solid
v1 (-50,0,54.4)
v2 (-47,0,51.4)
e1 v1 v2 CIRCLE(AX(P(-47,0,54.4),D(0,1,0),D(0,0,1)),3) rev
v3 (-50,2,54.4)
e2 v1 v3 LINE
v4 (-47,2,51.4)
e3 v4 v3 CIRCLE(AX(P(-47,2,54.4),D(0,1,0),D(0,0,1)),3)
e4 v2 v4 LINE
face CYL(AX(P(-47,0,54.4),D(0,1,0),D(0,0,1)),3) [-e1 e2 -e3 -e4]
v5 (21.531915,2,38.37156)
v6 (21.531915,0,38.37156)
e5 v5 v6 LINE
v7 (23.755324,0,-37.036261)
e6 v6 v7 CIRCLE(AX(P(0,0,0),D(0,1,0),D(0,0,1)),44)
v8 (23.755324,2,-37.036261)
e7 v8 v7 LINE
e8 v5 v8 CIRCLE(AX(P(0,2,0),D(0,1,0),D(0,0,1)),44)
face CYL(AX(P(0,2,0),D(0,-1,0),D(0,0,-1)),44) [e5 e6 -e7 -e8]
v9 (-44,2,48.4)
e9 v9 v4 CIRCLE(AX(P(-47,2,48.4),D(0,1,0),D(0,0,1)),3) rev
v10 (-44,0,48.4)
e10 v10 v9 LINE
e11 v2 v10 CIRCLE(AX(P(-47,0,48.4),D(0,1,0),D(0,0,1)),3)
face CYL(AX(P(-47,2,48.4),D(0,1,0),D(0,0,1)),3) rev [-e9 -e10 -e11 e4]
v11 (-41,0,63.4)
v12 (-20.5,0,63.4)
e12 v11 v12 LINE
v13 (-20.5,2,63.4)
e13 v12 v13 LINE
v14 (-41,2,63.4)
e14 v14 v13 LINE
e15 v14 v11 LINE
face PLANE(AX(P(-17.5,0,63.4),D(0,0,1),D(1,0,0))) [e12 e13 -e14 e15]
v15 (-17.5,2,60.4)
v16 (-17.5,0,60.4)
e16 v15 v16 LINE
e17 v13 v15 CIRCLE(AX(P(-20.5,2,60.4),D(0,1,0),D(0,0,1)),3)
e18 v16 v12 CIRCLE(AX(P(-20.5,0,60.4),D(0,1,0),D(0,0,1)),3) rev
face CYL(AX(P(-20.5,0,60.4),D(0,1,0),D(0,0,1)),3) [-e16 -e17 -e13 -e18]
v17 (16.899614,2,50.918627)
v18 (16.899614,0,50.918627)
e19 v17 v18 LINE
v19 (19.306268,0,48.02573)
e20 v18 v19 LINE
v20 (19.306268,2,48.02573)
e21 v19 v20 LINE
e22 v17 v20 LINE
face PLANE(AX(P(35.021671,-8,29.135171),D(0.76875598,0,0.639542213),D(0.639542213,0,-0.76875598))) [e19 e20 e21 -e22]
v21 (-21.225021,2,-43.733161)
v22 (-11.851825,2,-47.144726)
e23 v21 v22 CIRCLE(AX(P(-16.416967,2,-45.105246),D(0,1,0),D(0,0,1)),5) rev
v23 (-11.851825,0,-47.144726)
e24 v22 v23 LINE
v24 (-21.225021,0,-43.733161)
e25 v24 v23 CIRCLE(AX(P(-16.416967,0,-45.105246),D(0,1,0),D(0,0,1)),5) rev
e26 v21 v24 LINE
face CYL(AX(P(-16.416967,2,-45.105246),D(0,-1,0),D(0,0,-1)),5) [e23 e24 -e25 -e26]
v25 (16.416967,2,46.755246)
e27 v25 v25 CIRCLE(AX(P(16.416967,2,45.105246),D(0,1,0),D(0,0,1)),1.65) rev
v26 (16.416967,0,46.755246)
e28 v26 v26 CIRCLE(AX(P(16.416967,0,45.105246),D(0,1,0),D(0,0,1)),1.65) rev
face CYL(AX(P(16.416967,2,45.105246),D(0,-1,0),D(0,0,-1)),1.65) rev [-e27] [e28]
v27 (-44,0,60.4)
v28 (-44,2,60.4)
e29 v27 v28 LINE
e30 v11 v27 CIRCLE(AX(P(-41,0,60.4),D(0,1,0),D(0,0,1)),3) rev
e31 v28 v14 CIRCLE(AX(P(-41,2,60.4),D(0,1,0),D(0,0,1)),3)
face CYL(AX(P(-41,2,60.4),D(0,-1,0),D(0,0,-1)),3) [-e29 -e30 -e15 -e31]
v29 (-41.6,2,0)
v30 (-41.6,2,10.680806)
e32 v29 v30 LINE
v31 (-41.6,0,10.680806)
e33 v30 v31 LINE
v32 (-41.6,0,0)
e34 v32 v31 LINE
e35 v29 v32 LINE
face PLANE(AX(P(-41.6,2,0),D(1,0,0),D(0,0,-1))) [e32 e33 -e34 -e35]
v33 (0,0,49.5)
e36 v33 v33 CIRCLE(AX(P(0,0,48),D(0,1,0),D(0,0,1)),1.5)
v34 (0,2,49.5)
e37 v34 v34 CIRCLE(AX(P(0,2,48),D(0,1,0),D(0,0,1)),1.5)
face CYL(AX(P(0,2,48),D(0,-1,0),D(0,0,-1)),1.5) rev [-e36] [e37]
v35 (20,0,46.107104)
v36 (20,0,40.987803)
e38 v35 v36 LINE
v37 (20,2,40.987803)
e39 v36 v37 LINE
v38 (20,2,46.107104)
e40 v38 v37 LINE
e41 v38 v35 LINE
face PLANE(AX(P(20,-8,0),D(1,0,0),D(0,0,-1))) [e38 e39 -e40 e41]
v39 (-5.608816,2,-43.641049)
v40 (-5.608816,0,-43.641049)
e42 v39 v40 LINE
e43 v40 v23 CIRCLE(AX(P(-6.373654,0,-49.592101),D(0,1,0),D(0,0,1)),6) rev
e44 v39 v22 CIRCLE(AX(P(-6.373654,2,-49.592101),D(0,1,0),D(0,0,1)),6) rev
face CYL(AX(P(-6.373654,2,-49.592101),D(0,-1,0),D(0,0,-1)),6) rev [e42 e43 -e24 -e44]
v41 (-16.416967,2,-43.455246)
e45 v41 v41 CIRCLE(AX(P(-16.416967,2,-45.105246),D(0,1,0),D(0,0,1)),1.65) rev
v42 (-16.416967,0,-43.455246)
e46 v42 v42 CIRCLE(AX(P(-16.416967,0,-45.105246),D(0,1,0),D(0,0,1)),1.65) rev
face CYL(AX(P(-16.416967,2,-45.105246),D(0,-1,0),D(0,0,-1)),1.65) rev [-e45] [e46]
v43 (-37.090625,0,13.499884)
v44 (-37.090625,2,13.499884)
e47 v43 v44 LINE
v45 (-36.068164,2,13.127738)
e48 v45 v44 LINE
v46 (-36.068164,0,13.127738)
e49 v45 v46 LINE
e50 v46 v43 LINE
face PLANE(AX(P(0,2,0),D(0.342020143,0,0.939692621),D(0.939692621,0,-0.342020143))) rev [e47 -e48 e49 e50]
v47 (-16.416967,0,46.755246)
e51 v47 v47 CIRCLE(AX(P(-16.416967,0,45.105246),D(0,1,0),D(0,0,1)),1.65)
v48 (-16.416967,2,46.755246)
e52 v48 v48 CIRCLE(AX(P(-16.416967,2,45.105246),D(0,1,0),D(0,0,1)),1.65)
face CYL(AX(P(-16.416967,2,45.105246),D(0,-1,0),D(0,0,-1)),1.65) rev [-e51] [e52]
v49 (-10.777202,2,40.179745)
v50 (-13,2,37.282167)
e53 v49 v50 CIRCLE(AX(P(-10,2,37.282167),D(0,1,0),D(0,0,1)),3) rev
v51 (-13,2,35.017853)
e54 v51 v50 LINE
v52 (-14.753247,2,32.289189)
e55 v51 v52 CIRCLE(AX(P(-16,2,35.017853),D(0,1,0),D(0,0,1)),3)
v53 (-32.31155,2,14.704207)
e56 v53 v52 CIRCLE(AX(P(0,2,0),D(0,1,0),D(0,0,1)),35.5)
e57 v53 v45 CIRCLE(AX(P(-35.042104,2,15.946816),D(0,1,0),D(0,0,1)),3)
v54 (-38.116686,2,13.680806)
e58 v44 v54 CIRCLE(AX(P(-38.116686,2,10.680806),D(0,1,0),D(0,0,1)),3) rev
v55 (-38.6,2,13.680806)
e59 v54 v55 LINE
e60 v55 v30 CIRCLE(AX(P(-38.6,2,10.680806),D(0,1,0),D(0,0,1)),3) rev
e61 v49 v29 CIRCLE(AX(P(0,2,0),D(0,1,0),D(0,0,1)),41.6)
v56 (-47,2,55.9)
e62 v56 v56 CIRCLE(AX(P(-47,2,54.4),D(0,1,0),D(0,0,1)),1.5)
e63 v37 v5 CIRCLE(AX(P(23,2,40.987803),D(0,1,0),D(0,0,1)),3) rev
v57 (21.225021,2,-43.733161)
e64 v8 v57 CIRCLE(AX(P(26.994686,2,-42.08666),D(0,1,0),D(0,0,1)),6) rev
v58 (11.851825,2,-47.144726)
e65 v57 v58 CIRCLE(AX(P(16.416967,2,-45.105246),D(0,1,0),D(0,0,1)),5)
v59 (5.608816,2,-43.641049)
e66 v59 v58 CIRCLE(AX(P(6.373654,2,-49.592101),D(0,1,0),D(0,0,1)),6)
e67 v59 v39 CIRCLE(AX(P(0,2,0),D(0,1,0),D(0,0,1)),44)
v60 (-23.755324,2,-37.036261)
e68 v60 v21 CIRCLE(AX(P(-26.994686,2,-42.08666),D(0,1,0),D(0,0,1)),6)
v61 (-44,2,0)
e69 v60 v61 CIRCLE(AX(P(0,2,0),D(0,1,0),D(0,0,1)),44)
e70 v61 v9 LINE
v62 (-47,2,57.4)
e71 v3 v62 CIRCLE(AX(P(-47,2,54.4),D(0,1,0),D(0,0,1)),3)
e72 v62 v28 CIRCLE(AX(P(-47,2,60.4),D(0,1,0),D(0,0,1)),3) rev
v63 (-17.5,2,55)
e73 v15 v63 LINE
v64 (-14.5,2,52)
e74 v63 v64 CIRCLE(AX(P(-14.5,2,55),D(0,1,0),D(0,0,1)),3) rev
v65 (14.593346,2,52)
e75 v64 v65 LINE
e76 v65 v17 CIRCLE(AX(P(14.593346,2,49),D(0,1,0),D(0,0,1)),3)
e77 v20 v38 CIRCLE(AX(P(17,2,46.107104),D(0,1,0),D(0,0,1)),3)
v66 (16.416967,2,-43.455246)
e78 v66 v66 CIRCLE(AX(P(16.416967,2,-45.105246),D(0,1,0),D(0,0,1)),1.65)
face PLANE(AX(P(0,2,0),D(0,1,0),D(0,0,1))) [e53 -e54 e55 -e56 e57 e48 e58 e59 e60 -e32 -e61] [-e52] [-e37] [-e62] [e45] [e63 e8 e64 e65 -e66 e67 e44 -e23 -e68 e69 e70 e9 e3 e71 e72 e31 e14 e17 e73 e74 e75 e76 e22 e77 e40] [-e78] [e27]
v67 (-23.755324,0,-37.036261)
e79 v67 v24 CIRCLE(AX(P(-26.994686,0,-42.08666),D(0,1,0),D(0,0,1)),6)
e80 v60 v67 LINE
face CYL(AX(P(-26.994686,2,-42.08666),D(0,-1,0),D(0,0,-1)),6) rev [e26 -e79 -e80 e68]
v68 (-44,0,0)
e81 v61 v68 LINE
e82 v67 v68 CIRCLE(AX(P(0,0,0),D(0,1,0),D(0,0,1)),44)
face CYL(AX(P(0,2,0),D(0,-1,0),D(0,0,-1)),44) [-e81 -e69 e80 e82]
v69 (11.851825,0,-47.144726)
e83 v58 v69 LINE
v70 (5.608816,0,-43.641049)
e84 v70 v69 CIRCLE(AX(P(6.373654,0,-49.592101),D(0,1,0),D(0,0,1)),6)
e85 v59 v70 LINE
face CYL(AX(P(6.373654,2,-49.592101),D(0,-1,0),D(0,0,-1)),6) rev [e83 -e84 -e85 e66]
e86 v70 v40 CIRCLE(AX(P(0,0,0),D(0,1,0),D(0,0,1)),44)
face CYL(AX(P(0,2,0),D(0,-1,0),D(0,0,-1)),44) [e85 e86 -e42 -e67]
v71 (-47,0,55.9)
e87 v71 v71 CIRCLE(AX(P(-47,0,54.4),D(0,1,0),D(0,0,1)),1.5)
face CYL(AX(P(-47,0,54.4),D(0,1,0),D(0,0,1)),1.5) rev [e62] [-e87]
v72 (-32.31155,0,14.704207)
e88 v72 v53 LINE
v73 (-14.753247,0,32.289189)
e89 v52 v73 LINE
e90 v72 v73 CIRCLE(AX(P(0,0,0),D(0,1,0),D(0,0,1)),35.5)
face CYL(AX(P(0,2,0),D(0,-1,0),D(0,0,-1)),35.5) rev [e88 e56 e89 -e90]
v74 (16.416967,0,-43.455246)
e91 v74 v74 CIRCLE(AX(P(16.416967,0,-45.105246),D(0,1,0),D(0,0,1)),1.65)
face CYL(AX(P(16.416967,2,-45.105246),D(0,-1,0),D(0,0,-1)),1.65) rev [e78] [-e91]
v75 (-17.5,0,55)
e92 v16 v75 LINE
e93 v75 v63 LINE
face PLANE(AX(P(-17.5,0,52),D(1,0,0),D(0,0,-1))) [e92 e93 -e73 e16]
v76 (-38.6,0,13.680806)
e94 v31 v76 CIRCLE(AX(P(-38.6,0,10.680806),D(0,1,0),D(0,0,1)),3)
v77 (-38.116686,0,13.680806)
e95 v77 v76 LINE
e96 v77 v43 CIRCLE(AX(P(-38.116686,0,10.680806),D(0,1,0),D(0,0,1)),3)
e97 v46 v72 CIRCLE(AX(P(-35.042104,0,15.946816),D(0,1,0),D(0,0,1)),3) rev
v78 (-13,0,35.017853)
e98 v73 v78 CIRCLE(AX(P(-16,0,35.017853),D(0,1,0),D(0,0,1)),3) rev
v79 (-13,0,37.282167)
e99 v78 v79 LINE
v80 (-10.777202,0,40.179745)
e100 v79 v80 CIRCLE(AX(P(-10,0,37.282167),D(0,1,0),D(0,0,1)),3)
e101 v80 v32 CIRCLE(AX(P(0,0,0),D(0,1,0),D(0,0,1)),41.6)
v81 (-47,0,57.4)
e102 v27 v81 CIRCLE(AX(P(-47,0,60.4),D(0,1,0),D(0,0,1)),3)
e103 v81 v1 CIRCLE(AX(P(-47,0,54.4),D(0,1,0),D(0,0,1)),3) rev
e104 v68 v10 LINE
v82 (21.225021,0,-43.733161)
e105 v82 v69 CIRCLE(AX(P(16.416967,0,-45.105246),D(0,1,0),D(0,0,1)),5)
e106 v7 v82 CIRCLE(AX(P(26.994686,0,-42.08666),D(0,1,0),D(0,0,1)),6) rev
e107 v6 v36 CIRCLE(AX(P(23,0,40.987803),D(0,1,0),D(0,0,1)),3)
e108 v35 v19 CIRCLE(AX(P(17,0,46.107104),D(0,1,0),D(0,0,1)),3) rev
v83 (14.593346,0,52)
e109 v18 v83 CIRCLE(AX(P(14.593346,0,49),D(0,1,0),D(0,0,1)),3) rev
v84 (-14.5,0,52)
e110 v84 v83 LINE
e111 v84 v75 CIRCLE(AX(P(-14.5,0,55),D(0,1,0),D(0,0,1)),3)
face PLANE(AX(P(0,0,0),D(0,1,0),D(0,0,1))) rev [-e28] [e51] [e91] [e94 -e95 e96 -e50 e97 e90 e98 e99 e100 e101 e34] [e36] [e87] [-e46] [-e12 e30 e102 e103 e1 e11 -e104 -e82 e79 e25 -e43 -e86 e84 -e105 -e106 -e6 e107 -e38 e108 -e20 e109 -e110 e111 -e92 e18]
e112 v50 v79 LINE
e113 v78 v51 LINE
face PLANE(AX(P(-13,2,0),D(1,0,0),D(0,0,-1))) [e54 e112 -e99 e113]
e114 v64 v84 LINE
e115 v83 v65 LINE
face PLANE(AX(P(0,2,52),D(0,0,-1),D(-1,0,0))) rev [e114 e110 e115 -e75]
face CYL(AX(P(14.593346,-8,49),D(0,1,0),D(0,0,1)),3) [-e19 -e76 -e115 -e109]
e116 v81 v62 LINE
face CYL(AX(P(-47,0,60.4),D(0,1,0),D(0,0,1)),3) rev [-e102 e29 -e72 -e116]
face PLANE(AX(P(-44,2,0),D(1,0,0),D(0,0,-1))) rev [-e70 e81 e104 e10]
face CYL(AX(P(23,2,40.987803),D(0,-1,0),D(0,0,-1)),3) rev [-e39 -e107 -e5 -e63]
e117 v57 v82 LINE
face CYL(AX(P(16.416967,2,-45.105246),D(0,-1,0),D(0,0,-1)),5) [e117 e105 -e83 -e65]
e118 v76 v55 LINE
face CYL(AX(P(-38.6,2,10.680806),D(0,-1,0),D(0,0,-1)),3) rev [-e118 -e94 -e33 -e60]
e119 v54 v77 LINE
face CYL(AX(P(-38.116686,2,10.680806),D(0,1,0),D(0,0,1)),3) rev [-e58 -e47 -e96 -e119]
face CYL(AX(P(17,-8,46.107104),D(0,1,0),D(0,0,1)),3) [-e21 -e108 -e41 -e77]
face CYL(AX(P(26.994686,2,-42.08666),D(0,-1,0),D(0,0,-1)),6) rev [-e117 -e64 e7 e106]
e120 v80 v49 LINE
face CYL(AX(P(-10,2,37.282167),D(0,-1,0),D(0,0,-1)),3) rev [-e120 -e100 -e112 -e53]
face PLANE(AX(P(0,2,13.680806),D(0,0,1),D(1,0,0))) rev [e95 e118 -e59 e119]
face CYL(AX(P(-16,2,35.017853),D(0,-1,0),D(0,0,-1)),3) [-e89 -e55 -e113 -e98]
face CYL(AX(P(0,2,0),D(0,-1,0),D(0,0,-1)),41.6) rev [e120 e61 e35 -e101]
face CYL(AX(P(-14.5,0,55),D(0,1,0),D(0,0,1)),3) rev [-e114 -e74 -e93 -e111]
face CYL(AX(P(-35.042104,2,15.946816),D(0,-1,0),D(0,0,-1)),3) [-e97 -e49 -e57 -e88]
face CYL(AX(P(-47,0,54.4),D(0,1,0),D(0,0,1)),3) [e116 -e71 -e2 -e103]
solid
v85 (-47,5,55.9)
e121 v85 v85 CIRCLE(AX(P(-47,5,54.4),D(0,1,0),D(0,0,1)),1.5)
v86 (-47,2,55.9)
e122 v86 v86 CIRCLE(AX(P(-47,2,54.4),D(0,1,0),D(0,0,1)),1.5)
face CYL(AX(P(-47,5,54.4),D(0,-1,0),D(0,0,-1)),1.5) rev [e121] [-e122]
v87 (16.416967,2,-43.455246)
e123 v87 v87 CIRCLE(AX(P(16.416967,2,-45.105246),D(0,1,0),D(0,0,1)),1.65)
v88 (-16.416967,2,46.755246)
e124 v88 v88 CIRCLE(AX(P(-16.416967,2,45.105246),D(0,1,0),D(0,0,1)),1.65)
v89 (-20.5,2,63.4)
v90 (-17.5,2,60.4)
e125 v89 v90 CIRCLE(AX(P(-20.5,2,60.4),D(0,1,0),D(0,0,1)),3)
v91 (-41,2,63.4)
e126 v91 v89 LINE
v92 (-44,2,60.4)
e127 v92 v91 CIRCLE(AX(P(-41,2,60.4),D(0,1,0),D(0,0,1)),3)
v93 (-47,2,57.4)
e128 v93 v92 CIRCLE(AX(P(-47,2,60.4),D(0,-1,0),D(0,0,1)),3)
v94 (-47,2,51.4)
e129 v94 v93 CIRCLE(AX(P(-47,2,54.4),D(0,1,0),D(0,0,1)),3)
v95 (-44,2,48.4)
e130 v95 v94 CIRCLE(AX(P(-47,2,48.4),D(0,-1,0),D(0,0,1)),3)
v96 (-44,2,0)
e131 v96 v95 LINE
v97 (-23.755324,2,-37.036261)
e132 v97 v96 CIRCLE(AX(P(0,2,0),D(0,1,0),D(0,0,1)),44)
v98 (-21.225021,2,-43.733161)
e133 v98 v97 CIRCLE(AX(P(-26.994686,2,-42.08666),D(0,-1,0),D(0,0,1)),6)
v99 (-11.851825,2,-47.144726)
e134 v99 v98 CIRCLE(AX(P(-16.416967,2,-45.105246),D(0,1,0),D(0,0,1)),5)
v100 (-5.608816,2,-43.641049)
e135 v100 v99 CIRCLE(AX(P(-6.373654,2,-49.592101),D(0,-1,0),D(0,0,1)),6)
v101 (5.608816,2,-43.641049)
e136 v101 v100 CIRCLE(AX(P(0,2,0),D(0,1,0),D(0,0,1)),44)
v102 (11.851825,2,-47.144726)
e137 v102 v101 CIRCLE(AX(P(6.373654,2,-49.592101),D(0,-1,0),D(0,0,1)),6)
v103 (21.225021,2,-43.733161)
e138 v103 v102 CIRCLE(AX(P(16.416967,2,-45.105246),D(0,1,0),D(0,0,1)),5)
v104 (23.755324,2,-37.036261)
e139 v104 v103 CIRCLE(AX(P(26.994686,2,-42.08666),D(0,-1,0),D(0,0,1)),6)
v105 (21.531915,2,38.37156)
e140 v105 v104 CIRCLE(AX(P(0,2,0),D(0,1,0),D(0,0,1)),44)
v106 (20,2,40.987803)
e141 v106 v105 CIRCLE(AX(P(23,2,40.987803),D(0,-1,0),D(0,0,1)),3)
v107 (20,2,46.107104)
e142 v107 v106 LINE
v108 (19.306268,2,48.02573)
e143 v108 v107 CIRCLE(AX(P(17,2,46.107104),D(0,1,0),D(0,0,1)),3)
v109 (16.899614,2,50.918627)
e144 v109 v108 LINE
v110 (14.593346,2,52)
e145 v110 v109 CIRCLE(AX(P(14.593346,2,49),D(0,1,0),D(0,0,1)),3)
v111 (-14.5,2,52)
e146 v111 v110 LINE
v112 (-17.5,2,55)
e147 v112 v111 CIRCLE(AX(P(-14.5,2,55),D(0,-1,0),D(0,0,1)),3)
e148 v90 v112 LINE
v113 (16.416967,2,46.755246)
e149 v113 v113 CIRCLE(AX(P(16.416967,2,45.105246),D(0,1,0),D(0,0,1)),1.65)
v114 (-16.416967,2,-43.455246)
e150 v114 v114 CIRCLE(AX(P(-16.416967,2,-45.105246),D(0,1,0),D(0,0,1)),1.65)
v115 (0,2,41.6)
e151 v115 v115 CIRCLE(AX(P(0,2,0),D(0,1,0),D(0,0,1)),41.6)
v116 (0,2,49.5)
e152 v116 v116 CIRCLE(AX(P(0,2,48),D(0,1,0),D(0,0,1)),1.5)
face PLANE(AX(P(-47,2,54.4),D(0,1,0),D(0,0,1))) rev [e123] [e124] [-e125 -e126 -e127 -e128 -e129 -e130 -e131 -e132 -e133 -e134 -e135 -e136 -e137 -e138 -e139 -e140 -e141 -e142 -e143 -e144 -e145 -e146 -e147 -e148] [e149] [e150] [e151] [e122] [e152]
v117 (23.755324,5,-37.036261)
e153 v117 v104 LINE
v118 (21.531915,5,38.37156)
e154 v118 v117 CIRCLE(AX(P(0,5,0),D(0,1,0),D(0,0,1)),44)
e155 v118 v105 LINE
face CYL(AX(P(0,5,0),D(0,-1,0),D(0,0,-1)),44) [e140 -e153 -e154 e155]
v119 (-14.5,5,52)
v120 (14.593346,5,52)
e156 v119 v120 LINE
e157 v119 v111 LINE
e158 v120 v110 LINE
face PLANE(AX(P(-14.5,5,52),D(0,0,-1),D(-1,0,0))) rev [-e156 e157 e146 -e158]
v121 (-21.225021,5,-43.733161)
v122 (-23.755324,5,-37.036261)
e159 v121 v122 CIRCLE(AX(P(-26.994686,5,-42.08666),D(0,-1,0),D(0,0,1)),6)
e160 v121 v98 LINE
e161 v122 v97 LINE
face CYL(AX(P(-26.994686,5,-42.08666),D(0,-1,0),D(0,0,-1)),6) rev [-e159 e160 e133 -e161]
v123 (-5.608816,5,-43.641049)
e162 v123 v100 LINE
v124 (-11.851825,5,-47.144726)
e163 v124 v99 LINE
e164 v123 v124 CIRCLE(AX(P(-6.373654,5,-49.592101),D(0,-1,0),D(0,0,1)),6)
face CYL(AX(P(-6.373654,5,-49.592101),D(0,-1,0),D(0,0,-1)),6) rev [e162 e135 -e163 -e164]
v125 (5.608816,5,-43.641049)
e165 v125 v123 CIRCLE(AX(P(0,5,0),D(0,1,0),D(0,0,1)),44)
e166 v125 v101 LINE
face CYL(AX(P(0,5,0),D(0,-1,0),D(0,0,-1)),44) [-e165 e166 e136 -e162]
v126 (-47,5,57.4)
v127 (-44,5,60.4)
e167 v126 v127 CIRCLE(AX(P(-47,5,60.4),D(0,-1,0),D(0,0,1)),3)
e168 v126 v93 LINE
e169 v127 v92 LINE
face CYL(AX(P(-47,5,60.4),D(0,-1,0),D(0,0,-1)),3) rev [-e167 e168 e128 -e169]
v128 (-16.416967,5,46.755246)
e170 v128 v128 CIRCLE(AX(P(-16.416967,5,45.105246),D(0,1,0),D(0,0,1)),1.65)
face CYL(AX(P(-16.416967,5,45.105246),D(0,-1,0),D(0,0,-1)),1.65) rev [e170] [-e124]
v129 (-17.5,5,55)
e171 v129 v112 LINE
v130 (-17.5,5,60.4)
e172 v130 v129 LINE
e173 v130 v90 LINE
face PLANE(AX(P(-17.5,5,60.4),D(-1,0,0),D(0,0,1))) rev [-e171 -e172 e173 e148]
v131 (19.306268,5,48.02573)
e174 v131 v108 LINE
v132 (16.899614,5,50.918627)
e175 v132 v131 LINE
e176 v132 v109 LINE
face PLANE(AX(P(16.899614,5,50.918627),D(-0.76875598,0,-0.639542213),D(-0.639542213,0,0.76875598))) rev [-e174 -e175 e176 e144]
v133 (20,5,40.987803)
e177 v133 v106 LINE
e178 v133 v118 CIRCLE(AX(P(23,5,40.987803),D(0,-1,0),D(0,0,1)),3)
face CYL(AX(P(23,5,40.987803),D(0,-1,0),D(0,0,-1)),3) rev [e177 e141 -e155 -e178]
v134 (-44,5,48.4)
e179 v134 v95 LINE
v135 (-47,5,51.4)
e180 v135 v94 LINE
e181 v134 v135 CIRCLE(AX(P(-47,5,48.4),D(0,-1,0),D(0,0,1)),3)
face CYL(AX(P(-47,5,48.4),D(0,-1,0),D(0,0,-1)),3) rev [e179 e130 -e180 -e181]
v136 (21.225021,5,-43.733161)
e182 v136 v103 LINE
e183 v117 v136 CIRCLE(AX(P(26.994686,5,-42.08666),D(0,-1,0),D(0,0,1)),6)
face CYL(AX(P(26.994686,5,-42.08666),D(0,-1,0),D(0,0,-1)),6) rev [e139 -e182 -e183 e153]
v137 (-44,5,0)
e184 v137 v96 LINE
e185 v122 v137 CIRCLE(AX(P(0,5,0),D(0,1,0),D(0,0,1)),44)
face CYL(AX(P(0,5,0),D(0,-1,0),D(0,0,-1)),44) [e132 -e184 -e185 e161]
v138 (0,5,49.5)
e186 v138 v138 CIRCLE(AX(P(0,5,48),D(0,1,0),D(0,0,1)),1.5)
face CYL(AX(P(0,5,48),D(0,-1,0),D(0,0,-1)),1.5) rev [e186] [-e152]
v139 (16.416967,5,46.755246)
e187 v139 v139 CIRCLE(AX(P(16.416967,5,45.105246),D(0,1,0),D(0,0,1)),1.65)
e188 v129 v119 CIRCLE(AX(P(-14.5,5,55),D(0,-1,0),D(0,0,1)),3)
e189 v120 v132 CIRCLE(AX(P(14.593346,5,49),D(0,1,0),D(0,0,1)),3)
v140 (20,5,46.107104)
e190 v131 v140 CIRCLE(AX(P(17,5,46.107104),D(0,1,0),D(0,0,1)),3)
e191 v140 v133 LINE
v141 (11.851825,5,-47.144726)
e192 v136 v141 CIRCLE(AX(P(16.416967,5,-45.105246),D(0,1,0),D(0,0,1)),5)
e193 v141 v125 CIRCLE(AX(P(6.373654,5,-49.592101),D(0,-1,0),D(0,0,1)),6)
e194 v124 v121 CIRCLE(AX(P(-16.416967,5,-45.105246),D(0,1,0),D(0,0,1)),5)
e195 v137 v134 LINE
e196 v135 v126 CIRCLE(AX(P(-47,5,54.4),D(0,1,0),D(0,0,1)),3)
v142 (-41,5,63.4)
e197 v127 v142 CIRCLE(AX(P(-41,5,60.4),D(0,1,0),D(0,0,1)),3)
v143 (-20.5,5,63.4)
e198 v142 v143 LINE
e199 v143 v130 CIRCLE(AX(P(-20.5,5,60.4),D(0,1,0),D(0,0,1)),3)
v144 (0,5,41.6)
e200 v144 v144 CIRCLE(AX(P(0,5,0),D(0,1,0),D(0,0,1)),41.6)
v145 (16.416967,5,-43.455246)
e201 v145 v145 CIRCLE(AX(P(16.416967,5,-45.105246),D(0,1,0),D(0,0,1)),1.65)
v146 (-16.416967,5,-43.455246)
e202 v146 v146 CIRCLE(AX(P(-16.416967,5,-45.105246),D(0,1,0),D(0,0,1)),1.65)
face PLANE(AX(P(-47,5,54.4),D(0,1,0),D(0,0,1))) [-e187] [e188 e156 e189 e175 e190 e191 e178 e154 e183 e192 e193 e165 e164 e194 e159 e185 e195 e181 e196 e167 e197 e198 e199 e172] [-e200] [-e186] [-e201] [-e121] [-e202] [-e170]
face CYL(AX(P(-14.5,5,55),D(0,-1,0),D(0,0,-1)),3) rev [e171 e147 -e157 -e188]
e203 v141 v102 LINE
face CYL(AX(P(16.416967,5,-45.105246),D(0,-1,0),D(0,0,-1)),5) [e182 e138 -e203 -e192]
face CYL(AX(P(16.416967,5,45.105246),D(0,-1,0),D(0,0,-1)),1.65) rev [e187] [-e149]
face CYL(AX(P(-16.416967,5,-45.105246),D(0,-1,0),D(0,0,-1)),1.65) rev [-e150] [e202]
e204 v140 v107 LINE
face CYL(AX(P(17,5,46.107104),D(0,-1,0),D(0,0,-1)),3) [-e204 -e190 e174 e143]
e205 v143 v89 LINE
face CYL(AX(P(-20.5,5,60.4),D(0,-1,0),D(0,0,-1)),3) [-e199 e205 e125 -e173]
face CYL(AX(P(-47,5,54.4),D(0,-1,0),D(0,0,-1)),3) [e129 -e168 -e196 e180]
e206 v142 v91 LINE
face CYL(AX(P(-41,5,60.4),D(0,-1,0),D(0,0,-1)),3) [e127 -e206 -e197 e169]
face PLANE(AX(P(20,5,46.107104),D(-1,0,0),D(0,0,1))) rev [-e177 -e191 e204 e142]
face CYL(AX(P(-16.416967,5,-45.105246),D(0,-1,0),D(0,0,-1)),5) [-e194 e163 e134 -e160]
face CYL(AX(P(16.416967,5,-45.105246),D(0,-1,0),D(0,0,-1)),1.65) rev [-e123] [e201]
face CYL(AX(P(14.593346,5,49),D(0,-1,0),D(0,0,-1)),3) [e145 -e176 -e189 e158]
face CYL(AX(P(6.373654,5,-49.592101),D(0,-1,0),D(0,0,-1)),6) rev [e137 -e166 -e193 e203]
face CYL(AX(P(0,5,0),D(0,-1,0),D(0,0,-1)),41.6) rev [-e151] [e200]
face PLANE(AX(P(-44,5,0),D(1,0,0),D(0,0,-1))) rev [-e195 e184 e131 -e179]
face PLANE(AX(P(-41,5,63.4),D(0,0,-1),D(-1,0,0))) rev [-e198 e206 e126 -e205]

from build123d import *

# Parameters (mm, degrees)
EXTRUDE_1_OUTLINE_R   = 1.65
EXTRUDE_1_OUTLINE_R_2 = 1.5
EXTRUDE_1_DEPTH       = 2
FILLET_1_R            = 3
CUT_EXTRUDE_START     = -10
CUT_EXTRUDE_1_DEPTH   = 10
SKETCH_5_W            = 26.5
SKETCH_5_H            = 11.4
EXTRUDE_2_DEPTH       = 2
SKETCH_6_W            = 6
SKETCH_6_H            = 6
SKETCH_6_R            = 1.5
EXTRUDE_3_DEPTH       = 2
FILLET_2_R            = 3
SKETCH_7_R            = 41.6
SKETCH_7_R_2          = 1.65
SKETCH_7_R_3          = 1.5
EXTRUDE_4_DEPTH       = 3


# Read off the part's stored shape, not the designer's step: 凸台-拉伸1
with BuildPart() as part:
    # 凸台-拉伸1 outline → 凸台-拉伸1 (new body)
    with BuildSketch(Plane(origin=(0, 0, 0), x_dir=(1, 0, 0), z_dir=(0, 1, 0))):
        with BuildLine():
            ThreePointArc((-11.851824833, 47.144725656), (-18.127067596, 49.803708902), (-21.22502096, 43.733161266))
            ThreePointArc((-21.22502096, 43.733161266), (-21.381953702, 39.965990651), (-23.755323553, 37.036260649))
            ThreePointArc((-23.755323553, 37.036260649), (-38.608510955, 21.104096328), (-44, 0))
            Line((-44, 0), (-44, -52))
            Line((-44, -52), (16, -52))
            ThreePointArc((16, -52), (36.555057081, -29.52964612), (44, 0))
            ThreePointArc((44, 0), (38.608510955, 21.104096328), (23.755323553, 37.036260649))
            ThreePointArc((23.755323553, 37.036260649), (21.381953702, 39.965990651), (21.22502096, 43.733161266))
            ThreePointArc((21.22502096, 43.733161266), (18.127067596, 49.803708902), (11.851824833, 47.144725656))
            ThreePointArc((11.851824833, 47.144725656), (9.310116783, 44.359779962), (5.608815852, 43.641049308))
            ThreePointArc((5.608815852, 43.641049308), (0, 44), (-5.608815852, 43.641049308))
            ThreePointArc((-5.608815852, 43.641049308), (-9.310116783, 44.359779962), (-11.851824833, 47.144725656))
        make_face()
        with Locations((-16.41696688, -45.105245798)):
            Circle(EXTRUDE_1_OUTLINE_R, mode=Mode.SUBTRACT)
        with Locations((0, -48)):
            Circle(EXTRUDE_1_OUTLINE_R_2, mode=Mode.SUBTRACT)
        with Locations((16.41696688, -45.105245798)):
            Circle(EXTRUDE_1_OUTLINE_R, mode=Mode.SUBTRACT)
        with Locations((-16.41696688, 45.105245798)):
            Circle(EXTRUDE_1_OUTLINE_R, mode=Mode.SUBTRACT)
        with BuildLine():
            Line((-13, -39.516578799), (-13, -33.034073318))
            ThreePointArc((-13, -33.034073318), (-25.424671464, -24.775715549), (-33.359088038, -12.141715088))
            Line((-33.359088038, -12.141715088), (-37.587704831, -13.680805733))
            Line((-37.587704831, -13.680805733), (-41.6, -13.680805733))
            Line((-41.6, -13.680805733), (-41.6, 0))
            ThreePointArc((-41.6, 0), (33.699851632, 24.390161951), (-13, -39.516578799))
        make_face(mode=Mode.SUBTRACT)
        with Locations((16.41696688, 45.105245798)):
            Circle(EXTRUDE_1_OUTLINE_R, mode=Mode.SUBTRACT)
    extrude(amount=EXTRUDE_1_DEPTH)

    # 圆角1
    fillet_1_edges = [part.edges().sort_by_distance(p)[0] for p in [
        (-13, 1, 33.034073318),
        (-13, 1, 39.516578799),
        (-41.6, 1, 13.680805733),
        (-37.587704831, 1, 13.680805733),
        (-33.359088038, 1, 12.141715088),
    ]]
    fillet(fillet_1_edges, radius=FILLET_1_R)

    # 草图3 → 切除-拉伸1 (cut)
    with BuildSketch(Plane(origin=(0, 2, 0), x_dir=(1, 0, 0), z_dir=(0, 1, 0)).offset(CUT_EXTRUDE_START)):
        with BuildLine():
            Line((20, -47.191835885), (16, -52))
            ThreePointArc((16, -52), (36.555057081, -29.52964612), (44, 0))
            ThreePointArc((44, 0), (37.523326079, -22.978250586), (20, -39.191835885))
            Line((20, -39.191835885), (20, -47.191835885))
        make_face()
    extrude(amount=CUT_EXTRUDE_1_DEPTH, mode=Mode.SUBTRACT)

    # 草图5 → 凸台-拉伸2 (add)
    with BuildSketch(Plane(origin=(0, 2, 0), x_dir=(1, 0, 0), z_dir=(0, 1, 0))):
        with Locations((-30.75, -57.7)):
            Rectangle(SKETCH_5_W, SKETCH_5_H)
    extrude(amount=-EXTRUDE_2_DEPTH)

    # 草图6 → 凸台-拉伸3 (add)
    with BuildSketch(Plane(origin=(0, 2, 0), x_dir=(1, 0, 0), z_dir=(0, 1, 0))):
        with Locations((-47, -54.4)):
            Rectangle(SKETCH_6_W, SKETCH_6_H)
        with Locations(Location((-47, -54.4, 0), (0, 0, 270))):
            Circle(SKETCH_6_R, mode=Mode.SUBTRACT)
    extrude(amount=-EXTRUDE_3_DEPTH)

    # 圆角2
    fillet_2_edges = [part.edges().sort_by_distance(p)[0] for p in [
        (20, 1, 39.191835885),
        (20, 1, 47.191835885),
        (-17.5, 1, 52),
        (-17.5, 1, 63.4),
        (-44, 1, 63.4),
        (-44, 1, 51.4),
        (16, 1, 52),
        (-44, 1, 57.4),
        (-50, 1, 57.4),
        (-50, 1, 51.4),
    ]]
    fillet(fillet_2_edges, radius=FILLET_2_R - 0.0001)  # a hair under: the kernel refuses the full size


with BuildPart() as body_2:
    # 草图7 → 凸台-拉伸4 (new body)
    with BuildSketch(Plane(origin=(0, 2, 0), x_dir=(1, 0, 0), z_dir=(0, 1, 0))):
        with BuildLine():
            Line((-41, -63.4), (-20.5, -63.4))
            ThreePointArc((-20.5, -63.4), (-18.378679656, -62.521320344), (-17.5, -60.4))
            Line((-17.5, -60.4), (-17.5, -55))
            ThreePointArc((-17.5, -55), (-16.621320344, -52.878679656), (-14.5, -52))
            Line((-14.5, -52), (14.59334641, -52))
            ThreePointArc((14.59334641, -52), (15.866947619, -51.716236359), (16.899614351, -50.91862664))
            Line((16.899614351, -50.91862664), (19.306267941, -48.025730283))
            ThreePointArc((19.306267941, -48.025730283), (19.8212412, -47.12720074), (20, -46.107103642))
            Line((20, -46.107103642), (20, -40.987803064))
            ThreePointArc((20, -40.987803064), (20.411153218, -39.471929606), (21.531914894, -38.371560315))
            ThreePointArc((21.531914894, -38.371560315), (43.980886271, -1.296781715), (23.755323553, 37.036260649))
            ThreePointArc((23.755323553, 37.036260649), (21.381953702, 39.965990651), (21.22502096, 43.733161266))
            ThreePointArc((21.22502096, 43.733161266), (18.127067596, 49.803708902), (11.851824833, 47.144725656))
            ThreePointArc((11.851824833, 47.144725656), (9.310116783, 44.359779962), (5.608815852, 43.641049308))
            ThreePointArc((5.608815852, 43.641049308), (0, 44), (-5.608815852, 43.641049308))
            ThreePointArc((-5.608815852, 43.641049308), (-9.310116783, 44.359779962), (-11.851824833, 47.144725656))
            ThreePointArc((-11.851824833, 47.144725656), (-18.127067596, 49.803708902), (-21.22502096, 43.733161266))
            ThreePointArc((-21.22502096, 43.733161266), (-21.381953702, 39.965990651), (-23.755323553, 37.036260649))
            ThreePointArc((-23.755323553, 37.036260649), (-38.608510955, 21.104096328), (-44, 0))
            Line((-44, 0), (-44, -48.4))
            ThreePointArc((-44, -48.4), (-44.878679656, -50.521320344), (-47, -51.4))
            ThreePointArc((-47, -51.4), (-49.121320344, -52.278679656), (-50, -54.4))
            ThreePointArc((-50, -54.4), (-49.121320344, -56.521320344), (-47, -57.4))
            ThreePointArc((-47, -57.4), (-44.878679656, -58.278679656), (-44, -60.4))
            ThreePointArc((-44, -60.4), (-43.121320344, -62.521320344), (-41, -63.4))
        make_face()
        with Locations(Location((0, 0, 0), (0, 0, 270))):
            Circle(SKETCH_7_R, mode=Mode.SUBTRACT)
        with Locations(Location((16.41696688, -45.105245798, 0), (0, 0, 270))):
            Circle(SKETCH_7_R_2, mode=Mode.SUBTRACT)
        with Locations(Location((0, -48, 0), (0, 0, 270))):
            Circle(SKETCH_7_R_3, mode=Mode.SUBTRACT)
        with Locations(Location((-16.41696688, -45.105245798, 0), (0, 0, 270))):
            Circle(SKETCH_7_R_2, mode=Mode.SUBTRACT)
        with Locations(Location((16.41696688, 45.105245798, 0), (0, 0, 270))):
            Circle(SKETCH_7_R_2, mode=Mode.SUBTRACT)
        with Locations(Location((-16.41696688, 45.105245798, 0), (0, 0, 270))):
            Circle(SKETCH_7_R_2, mode=Mode.SUBTRACT)
        with Locations(Location((-47, -54.4, 0), (0, 0, 270))):
            Circle(SKETCH_7_R_3, mode=Mode.SUBTRACT)
    extrude(amount=EXTRUDE_4_DEPTH)


solid = Compound([part.part, body_2.part])
